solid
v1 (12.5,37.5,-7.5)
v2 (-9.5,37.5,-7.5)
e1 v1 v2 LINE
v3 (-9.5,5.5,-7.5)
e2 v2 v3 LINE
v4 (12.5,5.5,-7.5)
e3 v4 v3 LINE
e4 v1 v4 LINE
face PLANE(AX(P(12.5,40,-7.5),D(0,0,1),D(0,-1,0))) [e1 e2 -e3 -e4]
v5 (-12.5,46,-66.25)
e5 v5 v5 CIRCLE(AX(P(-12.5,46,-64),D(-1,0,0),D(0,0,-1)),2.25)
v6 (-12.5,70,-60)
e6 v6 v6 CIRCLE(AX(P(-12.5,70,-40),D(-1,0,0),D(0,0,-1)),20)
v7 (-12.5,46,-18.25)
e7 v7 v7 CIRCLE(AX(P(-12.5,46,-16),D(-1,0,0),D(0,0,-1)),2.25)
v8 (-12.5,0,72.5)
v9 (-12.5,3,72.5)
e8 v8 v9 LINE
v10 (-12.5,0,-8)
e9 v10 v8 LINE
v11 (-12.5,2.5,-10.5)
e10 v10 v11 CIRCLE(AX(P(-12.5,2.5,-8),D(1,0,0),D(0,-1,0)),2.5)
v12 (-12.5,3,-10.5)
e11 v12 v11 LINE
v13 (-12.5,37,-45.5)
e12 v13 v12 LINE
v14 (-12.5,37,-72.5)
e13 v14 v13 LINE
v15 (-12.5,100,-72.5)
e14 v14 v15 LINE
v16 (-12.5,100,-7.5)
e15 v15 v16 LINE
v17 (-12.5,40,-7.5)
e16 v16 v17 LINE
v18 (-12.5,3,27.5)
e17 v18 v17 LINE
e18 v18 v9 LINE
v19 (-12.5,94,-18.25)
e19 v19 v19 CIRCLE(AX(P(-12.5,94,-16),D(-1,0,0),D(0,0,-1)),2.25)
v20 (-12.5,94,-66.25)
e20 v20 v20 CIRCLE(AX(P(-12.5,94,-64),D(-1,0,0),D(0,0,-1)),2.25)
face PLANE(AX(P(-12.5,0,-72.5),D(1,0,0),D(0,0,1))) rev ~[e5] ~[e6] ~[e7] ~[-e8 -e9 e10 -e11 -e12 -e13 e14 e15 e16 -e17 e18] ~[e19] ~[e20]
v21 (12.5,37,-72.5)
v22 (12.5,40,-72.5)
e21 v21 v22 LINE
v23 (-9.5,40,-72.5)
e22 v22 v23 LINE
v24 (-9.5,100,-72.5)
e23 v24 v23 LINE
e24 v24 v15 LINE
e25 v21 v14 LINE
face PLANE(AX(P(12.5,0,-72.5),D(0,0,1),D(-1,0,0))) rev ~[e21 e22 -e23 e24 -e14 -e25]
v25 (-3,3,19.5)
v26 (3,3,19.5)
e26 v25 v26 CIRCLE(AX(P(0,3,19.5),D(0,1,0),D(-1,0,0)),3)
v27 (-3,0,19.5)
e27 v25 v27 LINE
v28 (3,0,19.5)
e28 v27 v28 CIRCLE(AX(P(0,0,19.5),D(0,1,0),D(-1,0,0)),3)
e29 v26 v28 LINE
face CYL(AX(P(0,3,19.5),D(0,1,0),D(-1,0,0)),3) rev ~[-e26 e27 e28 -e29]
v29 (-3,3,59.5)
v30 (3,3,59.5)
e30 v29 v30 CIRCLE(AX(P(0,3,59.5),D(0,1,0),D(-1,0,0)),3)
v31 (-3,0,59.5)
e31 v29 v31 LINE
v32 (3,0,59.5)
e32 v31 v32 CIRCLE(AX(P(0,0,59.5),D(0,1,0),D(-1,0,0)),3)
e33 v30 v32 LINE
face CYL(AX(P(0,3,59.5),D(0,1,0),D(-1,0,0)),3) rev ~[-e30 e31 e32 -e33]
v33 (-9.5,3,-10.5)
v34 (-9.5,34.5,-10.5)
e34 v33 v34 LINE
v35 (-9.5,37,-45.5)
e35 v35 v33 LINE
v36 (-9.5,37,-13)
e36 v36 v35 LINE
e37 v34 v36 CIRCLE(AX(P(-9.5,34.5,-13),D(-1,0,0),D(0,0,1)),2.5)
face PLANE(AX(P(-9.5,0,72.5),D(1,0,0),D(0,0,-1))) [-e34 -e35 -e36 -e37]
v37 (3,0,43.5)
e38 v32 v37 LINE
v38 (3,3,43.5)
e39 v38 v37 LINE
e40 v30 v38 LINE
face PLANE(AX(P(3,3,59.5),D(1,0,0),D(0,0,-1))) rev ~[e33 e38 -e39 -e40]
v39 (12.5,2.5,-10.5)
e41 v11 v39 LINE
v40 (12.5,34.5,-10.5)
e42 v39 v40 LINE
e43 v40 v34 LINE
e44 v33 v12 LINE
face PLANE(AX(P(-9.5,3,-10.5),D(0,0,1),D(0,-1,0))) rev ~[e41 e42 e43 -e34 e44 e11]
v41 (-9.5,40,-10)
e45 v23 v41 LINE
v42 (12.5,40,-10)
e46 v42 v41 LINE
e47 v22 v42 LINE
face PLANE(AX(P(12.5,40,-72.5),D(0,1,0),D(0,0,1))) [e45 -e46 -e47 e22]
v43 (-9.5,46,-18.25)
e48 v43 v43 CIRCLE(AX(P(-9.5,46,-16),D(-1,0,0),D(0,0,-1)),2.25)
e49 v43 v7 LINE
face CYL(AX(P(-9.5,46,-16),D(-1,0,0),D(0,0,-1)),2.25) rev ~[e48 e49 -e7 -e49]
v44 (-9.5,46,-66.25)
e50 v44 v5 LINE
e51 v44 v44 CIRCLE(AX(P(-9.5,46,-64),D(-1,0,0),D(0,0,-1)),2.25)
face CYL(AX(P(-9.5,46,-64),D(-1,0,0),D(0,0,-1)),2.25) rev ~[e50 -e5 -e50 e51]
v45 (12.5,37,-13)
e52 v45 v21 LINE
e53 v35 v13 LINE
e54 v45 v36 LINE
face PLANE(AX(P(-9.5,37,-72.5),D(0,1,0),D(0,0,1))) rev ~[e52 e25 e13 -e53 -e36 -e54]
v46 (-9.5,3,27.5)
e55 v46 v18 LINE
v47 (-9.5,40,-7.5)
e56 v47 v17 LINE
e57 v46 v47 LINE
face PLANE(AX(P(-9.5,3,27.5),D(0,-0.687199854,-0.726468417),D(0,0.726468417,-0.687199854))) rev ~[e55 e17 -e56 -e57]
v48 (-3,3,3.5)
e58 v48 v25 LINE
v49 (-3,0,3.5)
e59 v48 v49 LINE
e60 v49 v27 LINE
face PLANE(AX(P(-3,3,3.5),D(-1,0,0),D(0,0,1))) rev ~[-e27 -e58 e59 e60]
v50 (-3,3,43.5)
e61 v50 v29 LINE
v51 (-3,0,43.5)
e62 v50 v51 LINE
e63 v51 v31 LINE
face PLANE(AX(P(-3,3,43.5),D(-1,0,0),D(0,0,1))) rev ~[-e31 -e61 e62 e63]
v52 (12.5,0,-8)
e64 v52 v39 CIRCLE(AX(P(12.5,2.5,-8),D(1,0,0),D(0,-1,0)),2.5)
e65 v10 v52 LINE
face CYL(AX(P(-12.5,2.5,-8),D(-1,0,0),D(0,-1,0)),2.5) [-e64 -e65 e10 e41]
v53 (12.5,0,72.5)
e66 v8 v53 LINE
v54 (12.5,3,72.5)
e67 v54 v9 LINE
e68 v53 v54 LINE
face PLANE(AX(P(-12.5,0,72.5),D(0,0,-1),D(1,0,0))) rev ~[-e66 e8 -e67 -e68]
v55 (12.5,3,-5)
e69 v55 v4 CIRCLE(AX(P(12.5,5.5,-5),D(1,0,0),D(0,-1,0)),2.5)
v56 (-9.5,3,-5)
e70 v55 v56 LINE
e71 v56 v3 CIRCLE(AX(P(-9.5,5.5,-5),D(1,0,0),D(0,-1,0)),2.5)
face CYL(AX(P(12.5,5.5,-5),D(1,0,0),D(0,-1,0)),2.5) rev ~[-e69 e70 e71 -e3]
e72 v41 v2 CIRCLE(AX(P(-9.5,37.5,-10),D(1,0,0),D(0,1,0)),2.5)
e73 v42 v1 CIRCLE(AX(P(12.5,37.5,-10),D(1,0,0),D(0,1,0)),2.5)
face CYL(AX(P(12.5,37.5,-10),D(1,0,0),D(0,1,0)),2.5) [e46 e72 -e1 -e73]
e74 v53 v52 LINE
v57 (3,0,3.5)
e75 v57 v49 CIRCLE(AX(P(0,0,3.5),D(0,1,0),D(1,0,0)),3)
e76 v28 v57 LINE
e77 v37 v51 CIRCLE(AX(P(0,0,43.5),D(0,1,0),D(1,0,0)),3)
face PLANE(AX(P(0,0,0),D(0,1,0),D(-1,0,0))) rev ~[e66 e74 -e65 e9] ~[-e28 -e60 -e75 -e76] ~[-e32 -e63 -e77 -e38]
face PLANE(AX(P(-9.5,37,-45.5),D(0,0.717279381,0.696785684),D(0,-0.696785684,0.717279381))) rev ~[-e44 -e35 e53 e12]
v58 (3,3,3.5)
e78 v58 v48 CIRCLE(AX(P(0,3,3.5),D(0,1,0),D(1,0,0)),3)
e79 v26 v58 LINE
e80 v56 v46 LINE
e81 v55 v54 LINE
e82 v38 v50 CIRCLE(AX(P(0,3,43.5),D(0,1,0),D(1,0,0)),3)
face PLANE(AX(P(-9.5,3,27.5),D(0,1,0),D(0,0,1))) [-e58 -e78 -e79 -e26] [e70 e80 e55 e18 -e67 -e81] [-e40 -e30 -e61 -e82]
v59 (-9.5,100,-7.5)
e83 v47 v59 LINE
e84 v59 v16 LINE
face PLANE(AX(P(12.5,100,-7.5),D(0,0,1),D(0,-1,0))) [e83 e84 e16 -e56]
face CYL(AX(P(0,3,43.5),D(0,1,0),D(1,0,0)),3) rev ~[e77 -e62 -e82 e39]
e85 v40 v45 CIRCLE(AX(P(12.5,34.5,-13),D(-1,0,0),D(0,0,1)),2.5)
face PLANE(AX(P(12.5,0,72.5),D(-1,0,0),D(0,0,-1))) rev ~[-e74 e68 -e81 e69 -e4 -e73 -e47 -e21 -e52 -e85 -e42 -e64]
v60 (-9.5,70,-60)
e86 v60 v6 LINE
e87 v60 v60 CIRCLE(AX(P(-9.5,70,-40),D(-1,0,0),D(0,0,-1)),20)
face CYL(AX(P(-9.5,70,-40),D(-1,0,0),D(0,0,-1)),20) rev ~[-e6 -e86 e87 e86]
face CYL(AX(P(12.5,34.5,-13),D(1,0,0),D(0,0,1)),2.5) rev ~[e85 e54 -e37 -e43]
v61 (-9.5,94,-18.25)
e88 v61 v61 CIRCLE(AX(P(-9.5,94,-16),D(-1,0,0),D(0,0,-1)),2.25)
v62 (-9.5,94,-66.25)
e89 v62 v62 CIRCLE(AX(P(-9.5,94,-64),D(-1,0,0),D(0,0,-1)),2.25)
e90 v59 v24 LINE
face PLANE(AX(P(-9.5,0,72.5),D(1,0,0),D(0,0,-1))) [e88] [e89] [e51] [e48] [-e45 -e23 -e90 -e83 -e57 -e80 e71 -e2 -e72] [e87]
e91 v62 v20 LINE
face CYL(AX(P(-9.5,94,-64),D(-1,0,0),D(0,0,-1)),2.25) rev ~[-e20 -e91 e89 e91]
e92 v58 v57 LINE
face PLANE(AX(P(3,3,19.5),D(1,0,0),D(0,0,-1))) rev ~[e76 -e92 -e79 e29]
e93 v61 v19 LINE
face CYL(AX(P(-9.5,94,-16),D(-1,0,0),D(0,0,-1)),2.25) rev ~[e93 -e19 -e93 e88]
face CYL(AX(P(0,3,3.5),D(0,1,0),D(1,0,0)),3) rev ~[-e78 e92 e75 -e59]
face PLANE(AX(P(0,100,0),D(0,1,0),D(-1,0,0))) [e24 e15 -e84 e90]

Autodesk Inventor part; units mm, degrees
ref_plane "YZ Plane" through (0, 0, 0) normal (1, 0, 0) x (0, 1, 0)
ref_plane "XZ Plane" through (0, 0, 0) normal (0, 1, 0) x (-1, 0, 0)
ref_plane "XY Plane" through (0, 0, 0) normal (0, 0, 1) x (1, 0, 0)
sketch "Skizze1" plane through (0, 0, 0) normal (0, 1, 0) x (-1, 0, 0)
  line L0 (12.5, 72.5) -> (-12.5, 72.5)
  line L1 (-12.5, 72.5) -> (-12.5, -72.5)
  line L2 (-12.5, -72.5) -> (12.5, -72.5)
  line L3 (12.5, -72.5) -> (12.5, 72.5)
  point P0 (0, 0)
  point P1 (0, 72.5)
  point P2 (-12.5, 0)
  dimension "d0" = 25
  dimension "d1" = 145
extrude "Extrusion1" add sketch "Skizze1" along normal blind 100
sketch "Skizze2" plane through (12.5, 0, 72.5) normal (1, 0, 0) x (0, 0, -1)
  line L0 (0, 0) -> (145, 0) construction
  line L1 (145, 0) -> (145, 100) construction
  line L2 (0, 100) -> (145, 100) construction
  line L3 (0, 0) -> (0, 100) construction
  line L4 (0, 100) -> (80, 100)
  line L5 (80, 100) -> (80, 40)
  line L6 (80, 40) -> (0, 40)
  line L7 (0, 40) -> (0, 100)
  point P0 (72.5, 0)
  dimension "d4" = 80
  dimension "d5" = 60
extrude "Extrusion2" cut sketch "Skizze2" against normal through all
sketch "Skizze3" plane through (12.5, 0, 72.5) normal (1, 0, 0) x (0, 0, -1)
  line L0 (80, 100) -> (80, 40) construction
  line L1 (80, 40) -> (0, 40) construction
  line L2 (0, 0) -> (0, 40) construction
  line L3 (0, 0) -> (145, 0) construction
  line L4 (145, 0) -> (145, 100) construction
  line L5 (80, 100) -> (145, 100) construction
  line L6 (0, 40) -> (80, 40)
  line L7 (80, 40) -> (80, 3)
  line L8 (80, 3) -> (0, 3)
  line L9 (0, 3) -> (0, 40)
  line L10 (80, 100) -> (145, 100)
  line L11 (145, 100) -> (145, 40)
  line L12 (145, 40) -> (80, 40)
  line L13 (80, 40) -> (80, 100)
  line L14 (145, 0) -> (83, 0)
  line L15 (83, 0) -> (83, 37)
  line L16 (83, 37) -> (145, 37)
  line L17 (145, 37) -> (145, 0)
  point P0 (72.5, 0)
  dimension "d8" = 3
  dimension "d9" = 3
  dimension "d10" = 3
extrude "Extrusion3" cut sketch "Skizze3" against normal blind 22
sketch "Skizze4" plane through (-9.5, 0, 72.5) normal (1, 0, 0) x (0, 0, -1)
  line L0 (0, 40) -> (80, 40) construction
  line L1 (0, 3) -> (0, 40) construction
  line L2 (80, 3) -> (0, 3) construction
  line L3 (80, 40) -> (80, 3) construction
  line L4 (80, 40) -> (80, 3)
  line L5 (80, 3) -> (45, 3)
  line L6 (45, 3) -> (80, 40)
  line L7 (80, 3) -> (0, 3) projected
  line L8 (145, 0) -> (83, 0) construction
  line L9 (145, 37) -> (145, 0) construction
  line L10 (83, 37) -> (145, 37) construction
  line L11 (83, 0) -> (83, 37) construction
  line L12 (118, 37) -> (83, 3)
  line L13 (83, 37) -> (118, 37)
  line L14 (83, 3) -> (83, 37)
  line L15 (45, 3) -> (0, 3)
  line L16 (0, 0) -> (0, 40) projected
  line L17 (0, 40) -> (0, 3)
  line L18 (0, 40) -> (80, 40)
  line L19 (83, 3) -> (83, 0)
  line L20 (145, 0) -> (0, 0) projected
  line L21 (83, 0) -> (145, 0)
  line L22 (145, 37) -> (145, 0) projected
  line L23 (145, 0) -> (145, 37)
  line L24 (145, 37) -> (118, 37)
  point P0 (72.5, 0)
  dimension "d13" = 35
  dimension "d14" = 35
extrude "Extrusion4" cut sketch "Skizze4" against normal through all contours L6 L7 L16 L18 | L24 L22 L20 L19 L12
sketch "Skizze5" plane through (-9.5, 0, 72.5) normal (1, 0, 0) x (0, 0, -1)
  line L0 (80, 40) -> (80, 100) construction
  line L1 (145, 40) -> (80, 40) construction
  line L2 (145, 100) -> (145, 40) construction
  line L3 (80, 100) -> (145, 100) construction
  line L4 (80, 40) -> (80, 100) construction
  line L5 (80, 70) -> (145, 70) construction
  line L6 (145, 100) -> (145, 40) construction
  line L7 (80, 100) -> (145, 100) construction
  line L8 (112.5, 100) -> (112.5, 40) construction
  line L9 (145, 40) -> (80, 40) construction
  point P0 (72.5, 0)
  point P1 (88.5, 94)
  point P2 (136.5, 94)
  point P3 (136.5, 46)
  point P4 (88.5, 46)
  dimension "d17" = 48
  dimension "d18" = 48
hole "Bohrung1" at (-9.5, 94, -16) at (-9.5, 94, -64) at (-9.5, 46, -64) at (-9.5, 46, -16) direction (-1, 0, 0) diameter 4.5 end through all
sketch "Skizze6" plane through (-9.5, 0, 72.5) normal (1, 0, 0) x (0, 0, -1)
  circle A0 centre (136.5, 46) radius 2.25 projected
  circle A1 centre (88.5, 94) radius 2.25 projected
  circle A2 centre (136.5, 94) radius 2.25 projected
  circle A3 centre (88.5, 46) radius 2.25 projected
  line L0 (80, 40) -> (80, 100) projected
  line L1 (145, 40) -> (80, 40) projected
  line L2 (145, 100) -> (145, 40) projected
  line L3 (80, 100) -> (145, 100) projected
  point P0 (72.5, 0)
  point P1 (112.5, 70)
  point P2 (80, 70)
  point P3 (112.5, 100)
hole "Bohrung2" at (-9.5, 70, -40) direction (-1, 0, 0) diameter 40 end through all
sketch "Skizze7" plane through (12.5, 3, 72.5) normal (0, 1, 0) x (1, 0, 0)
  line L0 (0, 80) -> (0, 0) construction
  line L1 (0, 80) -> (-22, 80) construction
  line L2 (-22, 80) -> (-22, 45) construction
  line L3 (-22, 45) -> (-25, 45) construction
  line L4 (-25, 0) -> (-25, 45) construction
  line L5 (0, 0) -> (-25, 0) construction
  line L6 (-9.5, 13) -> (-9.5, 29)
  arc A0 (-9.5, 29) -> (-15.5, 29) centre (-12.5, 29) ccw
  line L7 (-15.5, 29) -> (-15.5, 13)
  arc A1 (-15.5, 13) -> (-9.5, 13) centre (-12.5, 13) ccw
  line L8 (-9.5, 53) -> (-9.5, 69)
  arc A2 (-9.5, 69) -> (-15.5, 69) centre (-12.5, 69) ccw
  line L9 (-15.5, 69) -> (-15.5, 53)
  arc A3 (-15.5, 53) -> (-9.5, 53) centre (-12.5, 53) ccw
  line L10 (0, 10) -> (-25, 10) construction
  line L11 (0, 32) -> (-25, 32) construction
  line L12 (0, 80) -> (0, 0) construction
  line L13 (-25, 0) -> (-25, 45) construction
  line L14 (0, 50) -> (-22, 50) construction
  line L15 (0, 72) -> (-22, 72) construction
  point P0 (-12.5, 72.5)
  point P1 (-12.5, 0)
  dimension "d33" = 6
  dimension "d34" = 22
  dimension "d35" = 10
  dimension "d36" = 40
  dimension "d37" = 22
extrude "Extrusion5" cut sketch "Skizze7" against normal through all
fillet "Rundung1" radius 2.5 4 edges at (1.5, 40, -7.5) (1.5, 37, -10.5) (0, 0, -10.5) (1.5, 3, -7.5)
equation "\"d14\" = d13"
equation "\"d18\" = d17"
equation "\"d37\" = d34"
properties part number "Motorhalterung_Links"
